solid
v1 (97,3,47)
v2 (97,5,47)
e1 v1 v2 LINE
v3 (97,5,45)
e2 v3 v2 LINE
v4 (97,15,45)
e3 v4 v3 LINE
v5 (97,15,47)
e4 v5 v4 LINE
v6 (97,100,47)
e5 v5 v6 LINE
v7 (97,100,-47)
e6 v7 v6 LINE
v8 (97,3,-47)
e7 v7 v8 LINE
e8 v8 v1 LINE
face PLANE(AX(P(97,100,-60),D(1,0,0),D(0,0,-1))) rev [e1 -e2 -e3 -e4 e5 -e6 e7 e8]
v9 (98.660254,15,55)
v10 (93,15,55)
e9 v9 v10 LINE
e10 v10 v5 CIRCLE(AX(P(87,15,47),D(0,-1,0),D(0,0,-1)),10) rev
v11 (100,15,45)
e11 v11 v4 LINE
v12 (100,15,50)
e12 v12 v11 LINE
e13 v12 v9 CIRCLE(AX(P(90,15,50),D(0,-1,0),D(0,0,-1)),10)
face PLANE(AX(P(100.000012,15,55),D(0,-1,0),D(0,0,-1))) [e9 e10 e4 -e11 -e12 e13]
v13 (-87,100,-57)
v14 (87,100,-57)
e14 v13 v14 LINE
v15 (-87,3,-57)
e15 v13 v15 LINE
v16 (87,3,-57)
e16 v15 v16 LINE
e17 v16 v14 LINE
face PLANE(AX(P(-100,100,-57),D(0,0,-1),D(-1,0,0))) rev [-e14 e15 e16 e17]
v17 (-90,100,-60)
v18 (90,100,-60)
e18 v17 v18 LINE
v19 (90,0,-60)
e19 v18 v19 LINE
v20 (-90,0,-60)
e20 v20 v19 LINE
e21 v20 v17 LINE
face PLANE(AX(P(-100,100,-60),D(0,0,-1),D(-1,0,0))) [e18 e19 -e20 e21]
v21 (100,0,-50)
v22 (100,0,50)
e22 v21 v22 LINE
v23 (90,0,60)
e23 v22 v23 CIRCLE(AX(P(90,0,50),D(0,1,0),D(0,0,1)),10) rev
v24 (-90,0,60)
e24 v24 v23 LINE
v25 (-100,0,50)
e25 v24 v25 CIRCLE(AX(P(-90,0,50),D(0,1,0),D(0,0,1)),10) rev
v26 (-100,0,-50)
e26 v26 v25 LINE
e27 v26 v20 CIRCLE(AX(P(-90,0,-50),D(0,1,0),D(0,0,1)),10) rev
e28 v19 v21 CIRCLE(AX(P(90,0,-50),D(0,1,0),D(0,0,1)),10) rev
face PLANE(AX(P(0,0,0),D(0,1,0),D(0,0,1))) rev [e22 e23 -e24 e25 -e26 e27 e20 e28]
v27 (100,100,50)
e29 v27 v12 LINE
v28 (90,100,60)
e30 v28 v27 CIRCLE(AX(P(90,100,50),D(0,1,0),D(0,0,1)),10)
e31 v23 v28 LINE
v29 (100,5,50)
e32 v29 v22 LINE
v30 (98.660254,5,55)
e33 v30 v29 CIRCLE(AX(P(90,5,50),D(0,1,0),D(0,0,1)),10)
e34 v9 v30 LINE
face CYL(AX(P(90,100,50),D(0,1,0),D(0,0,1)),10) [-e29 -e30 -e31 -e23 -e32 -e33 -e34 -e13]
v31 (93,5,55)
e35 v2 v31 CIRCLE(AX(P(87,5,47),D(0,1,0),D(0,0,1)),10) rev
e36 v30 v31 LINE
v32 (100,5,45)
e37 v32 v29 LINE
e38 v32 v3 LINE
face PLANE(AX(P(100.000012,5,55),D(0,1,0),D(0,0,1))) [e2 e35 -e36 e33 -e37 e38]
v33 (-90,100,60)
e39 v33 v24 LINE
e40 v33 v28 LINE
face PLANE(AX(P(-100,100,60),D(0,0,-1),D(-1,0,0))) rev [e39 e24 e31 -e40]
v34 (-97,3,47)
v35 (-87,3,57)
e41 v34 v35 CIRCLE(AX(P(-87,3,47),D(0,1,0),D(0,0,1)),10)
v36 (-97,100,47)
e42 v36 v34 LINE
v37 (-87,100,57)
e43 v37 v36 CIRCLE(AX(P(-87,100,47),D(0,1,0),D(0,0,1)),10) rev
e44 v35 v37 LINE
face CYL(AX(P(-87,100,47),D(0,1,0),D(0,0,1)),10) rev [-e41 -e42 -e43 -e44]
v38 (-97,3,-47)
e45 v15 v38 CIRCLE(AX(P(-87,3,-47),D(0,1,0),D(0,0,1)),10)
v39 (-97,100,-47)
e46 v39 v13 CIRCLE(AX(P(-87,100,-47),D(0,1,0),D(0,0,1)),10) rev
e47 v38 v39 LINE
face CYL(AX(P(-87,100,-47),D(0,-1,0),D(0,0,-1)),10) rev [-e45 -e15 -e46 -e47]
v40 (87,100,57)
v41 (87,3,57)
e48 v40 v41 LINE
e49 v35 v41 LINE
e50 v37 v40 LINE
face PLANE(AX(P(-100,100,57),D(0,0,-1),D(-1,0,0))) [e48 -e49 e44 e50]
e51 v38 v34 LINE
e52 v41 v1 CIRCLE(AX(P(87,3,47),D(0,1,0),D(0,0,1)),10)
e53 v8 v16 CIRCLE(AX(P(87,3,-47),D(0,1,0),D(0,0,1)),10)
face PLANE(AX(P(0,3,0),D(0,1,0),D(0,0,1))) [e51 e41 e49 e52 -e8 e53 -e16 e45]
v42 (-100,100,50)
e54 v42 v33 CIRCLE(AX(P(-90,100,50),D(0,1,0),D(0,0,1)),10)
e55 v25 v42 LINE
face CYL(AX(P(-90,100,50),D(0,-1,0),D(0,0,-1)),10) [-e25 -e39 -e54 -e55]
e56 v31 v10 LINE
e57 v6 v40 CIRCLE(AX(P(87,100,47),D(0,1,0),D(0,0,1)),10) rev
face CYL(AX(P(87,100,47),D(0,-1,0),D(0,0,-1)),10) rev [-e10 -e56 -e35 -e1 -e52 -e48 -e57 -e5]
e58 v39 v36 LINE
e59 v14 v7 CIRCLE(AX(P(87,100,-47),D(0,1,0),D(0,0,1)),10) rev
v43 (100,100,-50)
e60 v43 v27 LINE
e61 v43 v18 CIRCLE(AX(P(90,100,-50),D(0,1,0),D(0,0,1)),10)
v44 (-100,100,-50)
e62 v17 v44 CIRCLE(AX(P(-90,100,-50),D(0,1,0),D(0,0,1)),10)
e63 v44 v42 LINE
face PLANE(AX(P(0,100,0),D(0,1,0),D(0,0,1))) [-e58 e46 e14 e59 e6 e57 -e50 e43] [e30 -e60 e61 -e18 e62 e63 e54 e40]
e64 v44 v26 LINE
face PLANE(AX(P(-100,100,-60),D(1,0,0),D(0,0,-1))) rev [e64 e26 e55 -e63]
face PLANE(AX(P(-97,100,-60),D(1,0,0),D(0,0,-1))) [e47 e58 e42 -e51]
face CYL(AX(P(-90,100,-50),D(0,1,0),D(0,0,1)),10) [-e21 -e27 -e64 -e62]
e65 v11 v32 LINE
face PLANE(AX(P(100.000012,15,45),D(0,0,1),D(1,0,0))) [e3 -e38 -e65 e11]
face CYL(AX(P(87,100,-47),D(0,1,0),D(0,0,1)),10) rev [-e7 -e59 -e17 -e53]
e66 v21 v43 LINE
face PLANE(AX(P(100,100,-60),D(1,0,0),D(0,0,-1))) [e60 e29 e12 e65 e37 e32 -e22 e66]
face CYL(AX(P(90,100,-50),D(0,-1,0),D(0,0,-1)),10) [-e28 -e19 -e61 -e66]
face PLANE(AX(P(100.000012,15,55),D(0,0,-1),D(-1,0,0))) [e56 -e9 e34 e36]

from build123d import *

# Parameters (mm, degrees)
SKETCH1_W                      = 200
SKETCH1_H                      = 120
BOSS_EXTRUDE1_DEPTH            = 100
SHELL1_T                       = -3
CUT_EXTRUDE1_REACH             = 233.517
SKETCH5_W                      = 10
SKETCH5_H                      = 10
CUT_EXTRUDE1_DIRECTION_2_DEPTH = 232.516738056
FILLET2_R                      = 10
FILLET3_R                      = 10


with BuildPart() as part:
    # Sketch1 → Boss-Extrude1 (new body)
    with BuildSketch(Plane(origin=(0, 0, 0), x_dir=(1, 0, 0), z_dir=(0, 1, 0))):
        Rectangle(SKETCH1_W, SKETCH1_H)
    extrude(amount=BOSS_EXTRUDE1_DEPTH)

    # Shell1
    shell1_openings = [part.faces().sort_by_distance(p)[0] for p in [
        (0, 100, 0),
    ]]
    offset(amount=SHELL1_T, openings=shell1_openings, kind=Kind.INTERSECTION)

    # Sketch5 → Cut-Extrude1 (cut, up to next)
    with BuildSketch(Plane(origin=(100, 0, 0), x_dir=(0, 0, -1), z_dir=(1, 0, 0)), mode=Mode.PRIVATE) as cut_extrude1_sk1:
        with Locations((-50, 10)):
            Rectangle(SKETCH5_W, SKETCH5_H)
    cut_extrude1_tool1 = extrude(cut_extrude1_sk1.sketch, amount=-CUT_EXTRUDE1_REACH, mode=Mode.PRIVATE) & part.part
    add(cut_extrude1_tool1.solids().sort_by_distance((100, 10, 50))[0], mode=Mode.SUBTRACT)

    # Sketch5 → Cut-Extrude1 direction 2 (cut)
    with BuildSketch(Plane(origin=(100, 0, 0), x_dir=(0, 0, -1), z_dir=(1, 0, 0))):
        with Locations((-50, 10)):
            Rectangle(SKETCH5_W, SKETCH5_H)
    extrude(amount=CUT_EXTRUDE1_DIRECTION_2_DEPTH, mode=Mode.SUBTRACT)

    # Fillet2
    # the kernel refuses this fillet: 10 mm, written as the material it takes off along each edge
    with BuildSketch(Plane(origin=(-100, -25, -60), x_dir=(1, 0, 0), z_dir=(0, 1, 0)), Plane(origin=(-100, -25, 60), x_dir=(0, 0, -1), z_dir=(0, 1, 0))) as fillet2_piece_1:
        with BuildLine():
            CenterArc((FILLET2_R, -FILLET2_R), FILLET2_R, 90, 90)
            Line((0, -FILLET2_R), (0, 0))
            Line((0, 0), (FILLET2_R, 0))
        make_face()
    extrude(amount=150, mode=Mode.SUBTRACT)
    with BuildSketch(Plane(origin=(100, -25, 60), x_dir=(0, 0, -1), z_dir=(0, 1, 0)), Plane(origin=(100, -25, -60), x_dir=(-1, 0, 0), z_dir=(0, 1, 0))) as fillet2_piece_2:
        with BuildLine():
            CenterArc((FILLET2_R, FILLET2_R), FILLET2_R, 180, 90)
            Line((0, FILLET2_R), (0, 0))
            Line((0, 0), (FILLET2_R, 0))
        make_face()
    extrude(amount=150, mode=Mode.SUBTRACT)

    # Fillet3
    # the kernel refuses this fillet: 10 mm, written as the material it adds along each edge
    with BuildSketch(Plane(origin=(-97, 100, 57), x_dir=(0, 0, -1), z_dir=(0, -1, 0))) as fillet3_piece_1:
        with BuildLine():
            CenterArc((FILLET3_R, FILLET3_R), FILLET3_R, 180, 90)
            Line((0, FILLET3_R), (0, 0))
            Line((0, 0), (FILLET3_R, 0))
        make_face()
    extrude(amount=97)
    with BuildSketch(Plane(origin=(97, 100, 57), x_dir=(0, 0, -1), z_dir=(0, -1, 0))) as fillet3_piece_2_section:
        with BuildLine():
            CenterArc((FILLET3_R, -FILLET3_R), FILLET3_R, 90, 90)
            Line((0, -FILLET3_R), (0, 0))
            Line((0, 0), (FILLET3_R, 0))
        make_face()
    fillet3_piece_2 = extrude(amount=97, mode=Mode.PRIVATE)
    fillet3_piece_2 = split(fillet3_piece_2, bisect_by=Plane(origin=(96.033482281, 15, 52.791302356), z_dir=(0, 1, 0)), keep=Keep.TOP, mode=Mode.PRIVATE)
    fillet3_piece_2 = split(fillet3_piece_2, bisect_by=Plane(origin=(96.033482281, 57.5, 55), z_dir=(0, 0, -1)), keep=Keep.TOP, mode=Mode.PRIVATE)
    add(fillet3_piece_2)
    with BuildSketch(Plane(origin=(97, 100, 57), x_dir=(0, 0, -1), z_dir=(0, -1, 0))) as fillet3_piece_3_section:
        with BuildLine():
            CenterArc((FILLET3_R, -FILLET3_R), FILLET3_R, 90, 90)
            Line((0, -FILLET3_R), (0, 0))
            Line((0, 0), (FILLET3_R, 0))
        make_face()
    fillet3_piece_3 = extrude(amount=97, mode=Mode.PRIVATE)
    fillet3_piece_3 = split(fillet3_piece_3, bisect_by=Plane(origin=(93.714174943, 15, 56.26775421), z_dir=(0, 1, 0)), keep=Keep.TOP, mode=Mode.PRIVATE)
    fillet3_piece_3 = split(fillet3_piece_3, bisect_by=Plane(origin=(93.714174943, 57.5, 55), z_dir=(0, 0, 1)), keep=Keep.TOP, mode=Mode.PRIVATE)
    add(fillet3_piece_3)
    with BuildSketch(Plane(origin=(97, 100, 57), x_dir=(0, 0, -1), z_dir=(0, -1, 0))) as fillet3_piece_4_section:
        with BuildLine():
            CenterArc((FILLET3_R, -FILLET3_R), FILLET3_R, 90, 90)
            Line((0, -FILLET3_R), (0, 0))
            Line((0, 0), (FILLET3_R, 0))
        make_face()
    fillet3_piece_4 = extrude(amount=97, mode=Mode.PRIVATE)
    fillet3_piece_4 = split(fillet3_piece_4, bisect_by=Plane(origin=(93.714174943, 15, 56.26775421), z_dir=(0, -1, 0)), keep=Keep.TOP, mode=Mode.PRIVATE)
    fillet3_piece_4 = split(fillet3_piece_4, bisect_by=Plane(origin=(93.714174943, 10, 55), z_dir=(0, 0, 1)), keep=Keep.TOP, mode=Mode.PRIVATE)
    fillet3_piece_4 = split(fillet3_piece_4, bisect_by=Plane(origin=(93.714174943, 5, 56.26775421), z_dir=(0, 1, 0)), keep=Keep.TOP, mode=Mode.PRIVATE)
    add(fillet3_piece_4)
    with BuildSketch(Plane(origin=(97, 100, 57), x_dir=(0, 0, -1), z_dir=(0, -1, 0))) as fillet3_piece_5_section:
        with BuildLine():
            CenterArc((FILLET3_R, -FILLET3_R), FILLET3_R, 90, 90)
            Line((0, -FILLET3_R), (0, 0))
            Line((0, 0), (FILLET3_R, 0))
        make_face()
    fillet3_piece_5 = extrude(amount=97, mode=Mode.PRIVATE)
    fillet3_piece_5 = split(fillet3_piece_5, bisect_by=Plane(origin=(96.033482281, 4, 55), z_dir=(0, 0, -1)), keep=Keep.TOP, mode=Mode.PRIVATE)
    fillet3_piece_5 = split(fillet3_piece_5, bisect_by=Plane(origin=(96.033482281, 5, 52.791302356), z_dir=(0, -1, 0)), keep=Keep.TOP, mode=Mode.PRIVATE)
    add(fillet3_piece_5)
    with BuildSketch(Plane(origin=(97, 100, 57), x_dir=(0, 0, -1), z_dir=(0, -1, 0))) as fillet3_piece_6_section:
        with BuildLine():
            CenterArc((FILLET3_R, -FILLET3_R), FILLET3_R, 90, 90)
            Line((0, -FILLET3_R), (0, 0))
            Line((0, 0), (FILLET3_R, 0))
        make_face()
    fillet3_piece_6 = extrude(amount=97, mode=Mode.PRIVATE)
    fillet3_piece_6 = split(fillet3_piece_6, bisect_by=Plane(origin=(93.714174943, 4, 55), z_dir=(0, 0, 1)), keep=Keep.TOP, mode=Mode.PRIVATE)
    fillet3_piece_6 = split(fillet3_piece_6, bisect_by=Plane(origin=(93.714174943, 5, 56.26775421), z_dir=(0, -1, 0)), keep=Keep.TOP, mode=Mode.PRIVATE)
    add(fillet3_piece_6)
    with BuildSketch(Plane(origin=(-97, 3, -57), x_dir=(1, 0, 0), z_dir=(0, 1, 0)), Plane(origin=(97, 100, -57), x_dir=(-1, 0, 0), z_dir=(0, -1, 0))) as fillet3_piece_7:
        with BuildLine():
            CenterArc((FILLET3_R, -FILLET3_R), FILLET3_R, 90, 90)
            Line((0, -FILLET3_R), (0, 0))
            Line((0, 0), (FILLET3_R, 0))
        make_face()
    extrude(amount=97)


solid = part.part
